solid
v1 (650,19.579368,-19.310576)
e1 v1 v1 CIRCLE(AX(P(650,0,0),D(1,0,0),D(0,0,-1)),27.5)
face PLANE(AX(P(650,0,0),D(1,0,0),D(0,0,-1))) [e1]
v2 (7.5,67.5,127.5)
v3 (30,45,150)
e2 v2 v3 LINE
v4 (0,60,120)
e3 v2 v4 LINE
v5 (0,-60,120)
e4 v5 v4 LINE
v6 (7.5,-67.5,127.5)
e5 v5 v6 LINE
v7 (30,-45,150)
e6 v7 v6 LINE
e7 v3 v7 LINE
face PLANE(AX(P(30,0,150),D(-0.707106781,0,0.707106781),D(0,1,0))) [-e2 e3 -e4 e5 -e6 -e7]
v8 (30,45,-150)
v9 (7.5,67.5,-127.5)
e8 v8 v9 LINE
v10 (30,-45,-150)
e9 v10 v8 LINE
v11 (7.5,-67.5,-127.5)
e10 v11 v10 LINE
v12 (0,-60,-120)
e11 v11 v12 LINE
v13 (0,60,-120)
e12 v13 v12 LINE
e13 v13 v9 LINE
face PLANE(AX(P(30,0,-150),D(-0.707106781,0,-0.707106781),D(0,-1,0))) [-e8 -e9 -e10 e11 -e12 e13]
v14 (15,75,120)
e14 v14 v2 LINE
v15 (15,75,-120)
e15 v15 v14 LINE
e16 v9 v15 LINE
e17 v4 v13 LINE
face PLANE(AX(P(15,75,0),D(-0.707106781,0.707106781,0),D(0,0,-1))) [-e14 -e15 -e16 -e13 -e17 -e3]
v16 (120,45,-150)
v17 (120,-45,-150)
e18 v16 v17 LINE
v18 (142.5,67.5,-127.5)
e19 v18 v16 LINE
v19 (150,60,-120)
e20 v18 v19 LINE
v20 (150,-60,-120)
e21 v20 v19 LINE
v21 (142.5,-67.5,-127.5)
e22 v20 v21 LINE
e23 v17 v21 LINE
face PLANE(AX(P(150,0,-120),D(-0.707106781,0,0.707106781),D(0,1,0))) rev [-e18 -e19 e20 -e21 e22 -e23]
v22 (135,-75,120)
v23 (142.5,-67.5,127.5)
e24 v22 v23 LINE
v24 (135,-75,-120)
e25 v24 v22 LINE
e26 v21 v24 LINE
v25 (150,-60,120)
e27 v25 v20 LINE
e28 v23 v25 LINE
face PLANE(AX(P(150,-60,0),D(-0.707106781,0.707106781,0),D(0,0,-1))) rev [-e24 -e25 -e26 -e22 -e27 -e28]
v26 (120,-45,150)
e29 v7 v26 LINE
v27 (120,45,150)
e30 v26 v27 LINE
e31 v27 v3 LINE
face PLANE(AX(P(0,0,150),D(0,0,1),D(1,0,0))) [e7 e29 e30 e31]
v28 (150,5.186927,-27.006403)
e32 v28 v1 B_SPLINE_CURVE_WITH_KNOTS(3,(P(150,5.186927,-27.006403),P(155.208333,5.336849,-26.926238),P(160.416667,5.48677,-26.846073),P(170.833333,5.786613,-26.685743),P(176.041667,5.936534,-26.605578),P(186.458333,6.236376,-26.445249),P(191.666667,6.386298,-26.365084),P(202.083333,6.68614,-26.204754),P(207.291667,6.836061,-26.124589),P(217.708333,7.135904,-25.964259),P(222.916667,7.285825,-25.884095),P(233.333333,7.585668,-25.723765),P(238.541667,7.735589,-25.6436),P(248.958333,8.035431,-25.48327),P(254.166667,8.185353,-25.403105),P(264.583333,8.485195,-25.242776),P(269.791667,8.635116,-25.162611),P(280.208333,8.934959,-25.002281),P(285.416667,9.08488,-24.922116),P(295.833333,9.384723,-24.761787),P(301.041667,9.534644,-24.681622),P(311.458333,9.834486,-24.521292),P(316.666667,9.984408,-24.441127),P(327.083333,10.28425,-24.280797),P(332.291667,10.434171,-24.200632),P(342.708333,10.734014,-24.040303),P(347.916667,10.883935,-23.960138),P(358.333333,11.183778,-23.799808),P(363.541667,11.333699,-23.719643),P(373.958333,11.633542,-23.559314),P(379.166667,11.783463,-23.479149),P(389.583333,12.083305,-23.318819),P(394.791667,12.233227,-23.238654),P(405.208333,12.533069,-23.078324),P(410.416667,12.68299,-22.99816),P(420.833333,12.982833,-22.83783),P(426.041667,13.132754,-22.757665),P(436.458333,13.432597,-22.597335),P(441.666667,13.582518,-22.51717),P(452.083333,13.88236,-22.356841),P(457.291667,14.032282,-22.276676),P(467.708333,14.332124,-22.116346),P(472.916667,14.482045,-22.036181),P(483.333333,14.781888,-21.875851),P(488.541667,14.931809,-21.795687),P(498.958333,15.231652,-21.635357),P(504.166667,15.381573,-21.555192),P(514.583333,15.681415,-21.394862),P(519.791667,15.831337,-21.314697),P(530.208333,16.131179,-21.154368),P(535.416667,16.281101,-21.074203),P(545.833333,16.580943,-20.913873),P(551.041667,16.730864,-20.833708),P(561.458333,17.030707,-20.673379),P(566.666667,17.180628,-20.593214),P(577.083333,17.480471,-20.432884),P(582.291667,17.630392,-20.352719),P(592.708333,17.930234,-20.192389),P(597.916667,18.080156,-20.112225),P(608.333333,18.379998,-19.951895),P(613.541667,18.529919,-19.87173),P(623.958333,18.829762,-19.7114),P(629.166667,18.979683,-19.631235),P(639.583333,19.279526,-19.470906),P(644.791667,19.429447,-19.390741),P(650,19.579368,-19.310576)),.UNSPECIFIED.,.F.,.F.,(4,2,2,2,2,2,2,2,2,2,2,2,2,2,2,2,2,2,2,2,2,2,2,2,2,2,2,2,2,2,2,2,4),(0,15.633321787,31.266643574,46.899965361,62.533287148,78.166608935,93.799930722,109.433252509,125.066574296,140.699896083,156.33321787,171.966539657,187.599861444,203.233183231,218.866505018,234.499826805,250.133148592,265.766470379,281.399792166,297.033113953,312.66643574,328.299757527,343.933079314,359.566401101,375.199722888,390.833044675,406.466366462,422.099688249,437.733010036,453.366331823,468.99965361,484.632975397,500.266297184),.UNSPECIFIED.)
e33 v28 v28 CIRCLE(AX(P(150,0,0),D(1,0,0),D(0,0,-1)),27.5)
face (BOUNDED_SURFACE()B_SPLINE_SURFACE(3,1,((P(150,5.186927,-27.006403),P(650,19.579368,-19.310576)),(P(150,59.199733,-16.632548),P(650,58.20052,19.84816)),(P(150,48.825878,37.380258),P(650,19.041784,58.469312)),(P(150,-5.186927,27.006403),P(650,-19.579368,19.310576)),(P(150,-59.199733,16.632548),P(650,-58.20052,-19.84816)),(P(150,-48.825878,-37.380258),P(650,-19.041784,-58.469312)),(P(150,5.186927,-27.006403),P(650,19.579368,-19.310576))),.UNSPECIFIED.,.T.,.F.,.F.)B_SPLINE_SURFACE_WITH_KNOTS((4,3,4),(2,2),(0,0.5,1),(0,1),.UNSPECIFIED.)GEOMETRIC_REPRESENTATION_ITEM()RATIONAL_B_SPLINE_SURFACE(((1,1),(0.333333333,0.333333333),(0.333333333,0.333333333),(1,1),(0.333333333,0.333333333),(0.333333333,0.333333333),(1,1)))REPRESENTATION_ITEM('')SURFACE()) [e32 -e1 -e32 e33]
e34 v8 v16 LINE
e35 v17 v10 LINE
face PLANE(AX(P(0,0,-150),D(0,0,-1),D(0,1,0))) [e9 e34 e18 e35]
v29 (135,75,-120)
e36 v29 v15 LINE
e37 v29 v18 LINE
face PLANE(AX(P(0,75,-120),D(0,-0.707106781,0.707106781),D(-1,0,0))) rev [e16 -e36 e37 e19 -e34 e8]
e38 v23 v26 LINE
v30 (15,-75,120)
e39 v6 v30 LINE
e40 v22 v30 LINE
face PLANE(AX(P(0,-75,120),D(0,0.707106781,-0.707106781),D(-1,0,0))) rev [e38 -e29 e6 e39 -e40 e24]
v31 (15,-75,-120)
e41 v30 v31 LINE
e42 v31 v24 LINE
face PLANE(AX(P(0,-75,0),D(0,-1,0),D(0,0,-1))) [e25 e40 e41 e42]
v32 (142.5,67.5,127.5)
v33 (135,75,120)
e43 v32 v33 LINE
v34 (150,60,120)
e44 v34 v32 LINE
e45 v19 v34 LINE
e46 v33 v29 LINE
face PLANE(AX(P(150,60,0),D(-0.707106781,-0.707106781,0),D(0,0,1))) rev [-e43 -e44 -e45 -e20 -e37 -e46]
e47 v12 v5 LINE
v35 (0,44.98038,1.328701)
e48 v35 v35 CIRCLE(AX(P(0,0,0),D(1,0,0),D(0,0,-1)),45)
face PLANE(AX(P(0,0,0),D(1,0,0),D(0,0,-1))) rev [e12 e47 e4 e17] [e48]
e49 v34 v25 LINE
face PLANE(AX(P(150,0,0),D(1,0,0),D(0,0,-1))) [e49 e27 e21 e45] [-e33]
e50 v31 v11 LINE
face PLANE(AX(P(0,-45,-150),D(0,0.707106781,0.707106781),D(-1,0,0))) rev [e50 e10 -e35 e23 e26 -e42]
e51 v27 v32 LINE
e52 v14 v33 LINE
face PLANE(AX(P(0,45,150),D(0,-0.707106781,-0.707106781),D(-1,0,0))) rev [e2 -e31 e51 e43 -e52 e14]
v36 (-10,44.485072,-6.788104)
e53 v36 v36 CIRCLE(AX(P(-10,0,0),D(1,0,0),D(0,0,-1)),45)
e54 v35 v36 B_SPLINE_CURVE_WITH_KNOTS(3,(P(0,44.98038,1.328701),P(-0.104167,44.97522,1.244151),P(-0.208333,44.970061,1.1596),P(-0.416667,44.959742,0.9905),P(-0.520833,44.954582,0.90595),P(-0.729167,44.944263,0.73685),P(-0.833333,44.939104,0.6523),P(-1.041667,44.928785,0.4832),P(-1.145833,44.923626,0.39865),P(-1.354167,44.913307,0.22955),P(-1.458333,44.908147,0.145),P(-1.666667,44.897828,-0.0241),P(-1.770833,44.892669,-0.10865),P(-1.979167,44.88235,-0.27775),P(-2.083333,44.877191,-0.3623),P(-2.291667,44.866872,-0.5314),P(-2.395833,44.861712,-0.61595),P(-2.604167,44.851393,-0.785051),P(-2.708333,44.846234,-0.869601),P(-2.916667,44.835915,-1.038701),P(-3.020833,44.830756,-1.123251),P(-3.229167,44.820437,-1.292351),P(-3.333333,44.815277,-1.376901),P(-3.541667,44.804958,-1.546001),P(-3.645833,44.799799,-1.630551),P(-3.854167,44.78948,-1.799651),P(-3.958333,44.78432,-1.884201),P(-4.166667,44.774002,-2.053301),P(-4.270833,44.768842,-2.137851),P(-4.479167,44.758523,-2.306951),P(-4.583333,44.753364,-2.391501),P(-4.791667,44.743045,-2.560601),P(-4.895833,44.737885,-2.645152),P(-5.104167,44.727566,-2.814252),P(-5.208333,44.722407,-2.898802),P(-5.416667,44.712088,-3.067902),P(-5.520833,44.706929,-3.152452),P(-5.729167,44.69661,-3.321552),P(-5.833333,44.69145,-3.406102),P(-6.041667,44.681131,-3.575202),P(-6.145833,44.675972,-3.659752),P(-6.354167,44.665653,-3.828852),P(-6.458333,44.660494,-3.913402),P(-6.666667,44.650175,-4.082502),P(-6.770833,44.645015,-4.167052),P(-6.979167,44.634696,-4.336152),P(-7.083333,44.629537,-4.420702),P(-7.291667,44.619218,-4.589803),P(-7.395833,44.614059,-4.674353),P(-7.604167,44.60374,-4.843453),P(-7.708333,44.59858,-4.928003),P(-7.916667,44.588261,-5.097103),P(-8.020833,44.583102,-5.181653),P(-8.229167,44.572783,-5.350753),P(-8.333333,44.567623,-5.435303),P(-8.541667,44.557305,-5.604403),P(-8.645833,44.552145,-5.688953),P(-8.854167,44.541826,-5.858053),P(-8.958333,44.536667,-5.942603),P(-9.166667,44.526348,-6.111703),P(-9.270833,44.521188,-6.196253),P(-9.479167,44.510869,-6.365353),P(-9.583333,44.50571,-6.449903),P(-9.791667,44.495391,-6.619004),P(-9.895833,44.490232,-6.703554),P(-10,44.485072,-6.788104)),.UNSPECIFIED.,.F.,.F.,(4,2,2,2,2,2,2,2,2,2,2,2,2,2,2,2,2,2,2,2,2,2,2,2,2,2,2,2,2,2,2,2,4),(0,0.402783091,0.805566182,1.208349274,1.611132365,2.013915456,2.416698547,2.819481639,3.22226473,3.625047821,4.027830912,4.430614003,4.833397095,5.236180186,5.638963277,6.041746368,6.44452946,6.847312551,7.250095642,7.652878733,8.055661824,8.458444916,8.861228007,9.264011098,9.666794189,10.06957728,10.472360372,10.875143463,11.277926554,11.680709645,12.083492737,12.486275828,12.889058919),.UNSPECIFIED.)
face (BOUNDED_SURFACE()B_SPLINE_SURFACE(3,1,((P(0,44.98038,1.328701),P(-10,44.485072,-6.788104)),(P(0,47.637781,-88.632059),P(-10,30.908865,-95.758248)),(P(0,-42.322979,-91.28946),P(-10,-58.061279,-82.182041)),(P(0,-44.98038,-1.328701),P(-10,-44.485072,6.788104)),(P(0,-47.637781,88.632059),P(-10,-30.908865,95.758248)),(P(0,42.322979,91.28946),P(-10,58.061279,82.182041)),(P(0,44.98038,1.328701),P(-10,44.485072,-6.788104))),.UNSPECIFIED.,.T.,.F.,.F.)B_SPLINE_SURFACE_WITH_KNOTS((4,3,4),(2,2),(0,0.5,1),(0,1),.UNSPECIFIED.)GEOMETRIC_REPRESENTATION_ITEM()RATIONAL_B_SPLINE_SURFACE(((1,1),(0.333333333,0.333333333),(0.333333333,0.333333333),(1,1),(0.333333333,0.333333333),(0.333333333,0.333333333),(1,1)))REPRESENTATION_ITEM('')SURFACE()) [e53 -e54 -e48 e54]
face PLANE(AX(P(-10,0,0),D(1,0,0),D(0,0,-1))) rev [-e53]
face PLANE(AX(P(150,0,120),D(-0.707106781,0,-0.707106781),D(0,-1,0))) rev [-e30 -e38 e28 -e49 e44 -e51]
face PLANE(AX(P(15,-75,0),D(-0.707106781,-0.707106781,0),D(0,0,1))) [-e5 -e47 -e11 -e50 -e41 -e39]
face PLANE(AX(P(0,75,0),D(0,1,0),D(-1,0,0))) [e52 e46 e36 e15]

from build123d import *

# Parameters (mm, degrees)
CHAFL_N2_SIZE = 30
CHAFL_N3_SIZE = 30
CHAFL_N4_SIZE = 30
CHAFL_N5_SIZE = 15


with BuildPart() as part:
    # Croquis3 → Recubrir1 section 0
    with BuildSketch(Plane(origin=(150, 0, 0), x_dir=(0, 0, -1), z_dir=(1, 0, 0))):
        with BuildLine():
            Line((-150, 75), (150, 75))
            Line((150, 75), (150, -75))
            Line((150, -75), (-150, -75))
            Line((-150, -75), (-150, 75))
        make_face()
    # Croquis2 → Recubrir1 section 1
    with BuildSketch(Plane(origin=(0, 0, 0), x_dir=(0, 0, -1), z_dir=(1, 0, 0))):
        with BuildLine():
            Line((-150, 75), (150, 75))
            Line((150, 75), (150, -75))
            Line((150, -75), (-150, -75))
            Line((-150, -75), (-150, 75))
        make_face()
    loft()

    # Recubrir2: read off the stored shape, not the designer's step
    # Recubrir2: loft between two sections, ruled curve by curve
    recubrir2_from = [
        Edge.make_bspline([(150, 5.186927484, -27.006402635), (150, 59.199732754, -16.632547667), (150, 48.825877786, 37.380257603), (150, -5.186927484, 27.006402635), (150, -59.199732754, 16.632547667), (150, -48.825877786, -37.380257603), (150, 5.186927484, -27.006402635)], [0, 0, 0, 0, 0.5, 0.5, 0.5, 1, 1, 1, 1], 3, [1, 0.333333333, 0.333333333, 1, 0.333333333, 0.333333333, 1]),
    ]
    recubrir2_to = [
        Edge.make_bspline([(650, 19.57936818, -19.310575902), (650, 58.200519984, 19.848160458), (650, 19.041783624, 58.469312262), (650, -19.57936818, 19.310575902), (650, -58.200519984, -19.848160458), (650, -19.041783624, -58.469312262), (650, 19.57936818, -19.310575902)], [0, 0, 0, 0, 0.5, 0.5, 0.5, 1, 1, 1, 1], 3, [1, 0.333333333, 0.333333333, 1, 0.333333333, 0.333333333, 1]),
    ]
    recubrir2 = Solid(Shell([*[Face.make_surface_from_curves(recubrir2_from[k], recubrir2_to[k]) for k in range(1)], Face(Wire(recubrir2_from)), Face(Wire(recubrir2_to))]))
    add(recubrir2)

    # Recubrir4: read off the stored shape, not the designer's step
    # Recubrir4: loft between two sections, ruled curve by curve
    recubrir4_from = [
        Edge.make_bspline([(0, 44.980379665, 1.328700551), (0, 47.637780767, -88.63205878), (0, -42.322978563, -91.289459882), (0, -44.980379665, -1.328700551), (0, -47.637780767, 88.63205878), (0, 42.322978563, 91.289459882), (0, 44.980379665, 1.328700551)], [0, 0, 0, 0, 0.5, 0.5, 0.5, 1, 1, 1, 1], 3, [1, 0.333333333, 0.333333333, 1, 0.333333333, 0.333333333, 1]),
    ]
    recubrir4_to = [
        Edge.make_bspline([(-10, 44.485072203, -6.788103644), (-10, 30.908864916, -95.75824805), (-10, -58.061279491, -82.182040763), (-10, -44.485072203, 6.788103644), (-10, -30.908864916, 95.75824805), (-10, 58.061279491, 82.182040763), (-10, 44.485072203, -6.788103644)], [0, 0, 0, 0, 0.5, 0.5, 0.5, 1, 1, 1, 1], 3, [1, 0.333333333, 0.333333333, 1, 0.333333333, 0.333333333, 1]),
    ]
    recubrir4 = Solid(Shell([*[Face.make_surface_from_curves(recubrir4_from[k], recubrir4_to[k]) for k in range(1)], Face(Wire(recubrir4_from)), Face(Wire(recubrir4_to))]))
    add(recubrir4)

    # Chaflán2
    chafl_n2_edges = [part.edges().sort_by_distance(p)[0] for p in [
        (75, -75, -150),
        (75, -75, 150),
        (75, 75, -150),
        (75, 75, 150),
    ]]
    chamfer(chafl_n2_edges, length=CHAFL_N2_SIZE)

    # Chaflán3
    chafl_n3_edges = [part.edges().sort_by_distance(p)[0] for p in [
        (0, 0, 150),
    ]]
    chamfer(chafl_n3_edges, length=CHAFL_N3_SIZE)

    # Chaflán4
    chafl_n4_edges = [part.edges().sort_by_distance(p)[0] for p in [
        (150, 0, -150),
        (0, 0, -150),
        (150, 0, 150),
    ]]
    chamfer(chafl_n4_edges, length=CHAFL_N4_SIZE)

    # Chaflán5
    chafl_n5_edges = [part.edges().sort_by_distance(p)[0] for p in [
        (0, 75, 0),
        (150, 75, 0),
        (150, -75, 0),
        (0, -75, 0),
    ]]
    chamfer(chafl_n5_edges, length=CHAFL_N5_SIZE)


solid = part.part
